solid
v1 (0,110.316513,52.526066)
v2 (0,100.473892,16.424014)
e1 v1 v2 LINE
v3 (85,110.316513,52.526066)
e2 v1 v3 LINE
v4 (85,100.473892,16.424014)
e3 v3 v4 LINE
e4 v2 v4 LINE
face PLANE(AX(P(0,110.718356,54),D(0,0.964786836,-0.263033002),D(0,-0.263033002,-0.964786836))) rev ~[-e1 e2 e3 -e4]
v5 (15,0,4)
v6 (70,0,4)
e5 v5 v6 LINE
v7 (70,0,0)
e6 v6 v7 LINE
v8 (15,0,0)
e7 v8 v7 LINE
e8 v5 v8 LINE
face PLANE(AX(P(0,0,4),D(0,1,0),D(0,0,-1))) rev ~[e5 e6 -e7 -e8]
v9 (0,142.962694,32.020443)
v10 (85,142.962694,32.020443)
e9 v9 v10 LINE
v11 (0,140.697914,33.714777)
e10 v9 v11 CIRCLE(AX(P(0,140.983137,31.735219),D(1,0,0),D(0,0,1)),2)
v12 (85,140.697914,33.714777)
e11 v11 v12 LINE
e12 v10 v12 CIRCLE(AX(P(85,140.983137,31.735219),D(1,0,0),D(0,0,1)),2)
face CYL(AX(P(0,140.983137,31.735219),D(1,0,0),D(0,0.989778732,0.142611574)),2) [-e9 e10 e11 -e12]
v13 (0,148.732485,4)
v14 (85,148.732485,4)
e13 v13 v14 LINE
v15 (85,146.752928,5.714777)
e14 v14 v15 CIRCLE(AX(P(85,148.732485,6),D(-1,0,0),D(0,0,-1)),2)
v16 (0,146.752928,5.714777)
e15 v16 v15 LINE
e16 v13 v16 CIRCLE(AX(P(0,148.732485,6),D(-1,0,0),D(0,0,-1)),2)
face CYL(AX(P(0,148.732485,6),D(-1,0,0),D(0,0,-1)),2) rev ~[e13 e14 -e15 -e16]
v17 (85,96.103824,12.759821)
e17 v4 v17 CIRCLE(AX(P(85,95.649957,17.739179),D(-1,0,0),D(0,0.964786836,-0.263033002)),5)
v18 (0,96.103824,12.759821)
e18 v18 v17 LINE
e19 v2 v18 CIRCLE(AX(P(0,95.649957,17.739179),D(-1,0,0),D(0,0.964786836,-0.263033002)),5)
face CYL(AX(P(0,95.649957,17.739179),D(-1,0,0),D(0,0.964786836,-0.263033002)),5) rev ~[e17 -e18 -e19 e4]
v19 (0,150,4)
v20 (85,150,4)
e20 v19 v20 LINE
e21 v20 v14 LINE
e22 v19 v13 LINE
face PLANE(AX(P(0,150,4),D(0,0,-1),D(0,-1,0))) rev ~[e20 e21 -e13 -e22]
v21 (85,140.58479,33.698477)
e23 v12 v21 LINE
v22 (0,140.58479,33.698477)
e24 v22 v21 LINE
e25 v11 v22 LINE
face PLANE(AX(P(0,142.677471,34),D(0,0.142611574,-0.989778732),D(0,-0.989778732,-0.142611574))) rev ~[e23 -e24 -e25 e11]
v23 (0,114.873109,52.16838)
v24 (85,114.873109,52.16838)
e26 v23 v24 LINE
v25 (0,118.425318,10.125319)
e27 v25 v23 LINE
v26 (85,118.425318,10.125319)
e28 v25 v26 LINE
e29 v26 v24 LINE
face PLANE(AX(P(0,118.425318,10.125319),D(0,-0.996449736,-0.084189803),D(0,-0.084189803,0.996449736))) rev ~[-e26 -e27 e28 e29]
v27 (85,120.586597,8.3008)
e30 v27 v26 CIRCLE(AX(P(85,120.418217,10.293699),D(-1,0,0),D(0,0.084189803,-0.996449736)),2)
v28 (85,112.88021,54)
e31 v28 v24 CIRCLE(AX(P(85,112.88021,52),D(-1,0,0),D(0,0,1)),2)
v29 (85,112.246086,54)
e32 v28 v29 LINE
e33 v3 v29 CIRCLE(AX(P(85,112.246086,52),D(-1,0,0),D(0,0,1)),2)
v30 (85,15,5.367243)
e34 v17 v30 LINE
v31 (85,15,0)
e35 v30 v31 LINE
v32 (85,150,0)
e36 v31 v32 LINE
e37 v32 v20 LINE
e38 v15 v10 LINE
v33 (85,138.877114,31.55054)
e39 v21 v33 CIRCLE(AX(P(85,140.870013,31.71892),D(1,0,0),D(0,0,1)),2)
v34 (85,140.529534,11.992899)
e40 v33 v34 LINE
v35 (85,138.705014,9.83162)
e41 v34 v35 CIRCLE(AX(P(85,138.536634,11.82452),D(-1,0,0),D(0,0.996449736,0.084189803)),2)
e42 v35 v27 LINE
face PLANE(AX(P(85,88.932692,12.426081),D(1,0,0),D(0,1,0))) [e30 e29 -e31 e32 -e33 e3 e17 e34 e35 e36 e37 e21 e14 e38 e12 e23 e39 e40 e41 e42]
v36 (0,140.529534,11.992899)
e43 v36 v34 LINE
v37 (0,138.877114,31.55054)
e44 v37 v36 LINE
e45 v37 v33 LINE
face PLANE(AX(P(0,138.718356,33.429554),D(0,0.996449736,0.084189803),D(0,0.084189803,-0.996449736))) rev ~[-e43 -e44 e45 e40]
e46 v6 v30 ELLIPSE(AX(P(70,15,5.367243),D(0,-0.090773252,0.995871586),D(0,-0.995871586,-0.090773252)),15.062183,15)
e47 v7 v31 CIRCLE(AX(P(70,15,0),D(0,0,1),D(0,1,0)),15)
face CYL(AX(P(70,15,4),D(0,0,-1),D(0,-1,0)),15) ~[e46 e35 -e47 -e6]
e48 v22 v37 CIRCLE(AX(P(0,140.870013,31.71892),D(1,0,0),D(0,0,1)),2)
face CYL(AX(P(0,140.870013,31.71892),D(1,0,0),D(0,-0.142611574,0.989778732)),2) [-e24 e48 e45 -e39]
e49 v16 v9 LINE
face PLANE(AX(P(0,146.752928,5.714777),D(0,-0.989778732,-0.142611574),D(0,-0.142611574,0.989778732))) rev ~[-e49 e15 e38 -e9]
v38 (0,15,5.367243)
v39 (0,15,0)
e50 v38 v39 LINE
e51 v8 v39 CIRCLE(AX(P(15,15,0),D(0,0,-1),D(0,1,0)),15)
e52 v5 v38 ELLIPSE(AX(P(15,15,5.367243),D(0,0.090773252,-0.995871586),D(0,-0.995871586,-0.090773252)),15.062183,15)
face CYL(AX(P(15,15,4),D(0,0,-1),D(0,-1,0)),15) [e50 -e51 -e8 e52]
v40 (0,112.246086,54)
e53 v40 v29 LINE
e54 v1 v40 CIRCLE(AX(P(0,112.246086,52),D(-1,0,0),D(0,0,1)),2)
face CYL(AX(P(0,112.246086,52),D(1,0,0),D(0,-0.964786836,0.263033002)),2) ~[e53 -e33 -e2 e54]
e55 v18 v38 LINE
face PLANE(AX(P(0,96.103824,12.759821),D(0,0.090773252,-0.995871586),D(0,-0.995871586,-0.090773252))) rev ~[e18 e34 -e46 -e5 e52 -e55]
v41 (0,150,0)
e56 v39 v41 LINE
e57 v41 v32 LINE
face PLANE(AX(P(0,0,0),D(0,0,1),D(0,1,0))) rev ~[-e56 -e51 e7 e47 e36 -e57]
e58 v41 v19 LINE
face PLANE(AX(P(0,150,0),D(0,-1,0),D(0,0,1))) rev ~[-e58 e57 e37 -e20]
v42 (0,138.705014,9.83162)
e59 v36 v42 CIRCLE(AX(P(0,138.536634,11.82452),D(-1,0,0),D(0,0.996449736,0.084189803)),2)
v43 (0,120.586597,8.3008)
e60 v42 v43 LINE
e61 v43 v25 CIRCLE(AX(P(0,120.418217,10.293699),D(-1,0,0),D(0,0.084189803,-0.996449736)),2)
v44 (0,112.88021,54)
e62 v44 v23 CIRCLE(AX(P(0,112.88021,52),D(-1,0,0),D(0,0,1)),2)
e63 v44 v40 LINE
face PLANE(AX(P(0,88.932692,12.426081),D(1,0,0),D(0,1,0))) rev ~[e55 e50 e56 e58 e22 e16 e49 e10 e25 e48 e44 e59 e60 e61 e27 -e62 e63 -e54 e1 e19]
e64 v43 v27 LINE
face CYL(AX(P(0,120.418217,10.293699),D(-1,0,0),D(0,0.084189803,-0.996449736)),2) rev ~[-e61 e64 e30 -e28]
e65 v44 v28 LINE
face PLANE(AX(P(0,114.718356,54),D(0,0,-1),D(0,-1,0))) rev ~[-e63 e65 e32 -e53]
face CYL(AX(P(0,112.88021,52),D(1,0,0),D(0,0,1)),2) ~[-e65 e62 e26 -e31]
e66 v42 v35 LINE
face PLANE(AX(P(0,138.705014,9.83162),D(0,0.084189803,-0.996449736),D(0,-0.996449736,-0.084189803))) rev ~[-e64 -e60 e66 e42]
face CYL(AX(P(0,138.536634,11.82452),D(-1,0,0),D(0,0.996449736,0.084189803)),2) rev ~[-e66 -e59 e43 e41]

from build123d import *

# Parameters (mm, degrees)
F1_DEPTH = 85
F2_R     = 15
F3_R     = 2


# Not quite as in the source:
# - a feature of the source that left no trace in its solid (it failed there, or was rolled back) is left out


with BuildPart() as f1:
    # F0 (on Right) → F1 (new body)
    with BuildSketch(Plane.YZ):
        with BuildLine():
            Line((0, 4), (0, 0))
            Line((0, 0), (150, 0))
            Line((150, 0), (150, 4))
            Line((150, 4), (148.7324850447, 4))
            ThreePointArc((148.7324850447, 4), (147.4229901607, 4.4883045449), (146.7529275801, 5.7147768512))
            Line((146.7529275801, 5.7147768512), (142.6774710417, 34))
            Line((142.6774710417, 34), (138.7183561126, 33.4295537023))
            Line((138.7183561126, 33.4295537023), (140.5295339709, 11.9928994727))
            ThreePointArc((140.5295339709, 11.9928994727), (140.064889591, 10.5343894965), (138.7050141045, 9.8316203937))
            Line((138.7050141045, 9.8316203937), (120.5865966006, 8.3007995736))
            ThreePointArc((120.5865966006, 8.3007995736), (119.1280866244, 8.7654439535), (118.4253175217, 10.12531944))
            Line((118.4253175217, 10.12531944), (114.7183561126, 54))
            Line((114.7183561126, 54), (110.7183561126, 54))
            Line((110.7183561126, 54), (100.473891609, 16.4240136891))
            ThreePointArc((100.473891609, 16.4240136891), (98.862490978, 13.9077784109), (96.1038236872, 12.759820769))
            Line((96.1038236872, 12.759820769), (0, 4))
        make_face()
    extrude(amount=F1_DEPTH)

    # F2
    f2_edges = [f1.edges().sort_by_distance(p)[0] for p in [
        (85, 0, 2),
        (0, 0, 2),
    ]]
    fillet(f2_edges, radius=F2_R)

    # F3
    f3_edges = [f1.edges().sort_by_distance(p)[0] for p in [
        (42.5, 110.718356, 54),
        (42.5, 114.718356, 54),
        (42.5, 138.718356, 33.429554),
        (42.5, 142.677471, 34),
    ]]
    fillet(f3_edges, radius=F3_R)


solid = f1.part
